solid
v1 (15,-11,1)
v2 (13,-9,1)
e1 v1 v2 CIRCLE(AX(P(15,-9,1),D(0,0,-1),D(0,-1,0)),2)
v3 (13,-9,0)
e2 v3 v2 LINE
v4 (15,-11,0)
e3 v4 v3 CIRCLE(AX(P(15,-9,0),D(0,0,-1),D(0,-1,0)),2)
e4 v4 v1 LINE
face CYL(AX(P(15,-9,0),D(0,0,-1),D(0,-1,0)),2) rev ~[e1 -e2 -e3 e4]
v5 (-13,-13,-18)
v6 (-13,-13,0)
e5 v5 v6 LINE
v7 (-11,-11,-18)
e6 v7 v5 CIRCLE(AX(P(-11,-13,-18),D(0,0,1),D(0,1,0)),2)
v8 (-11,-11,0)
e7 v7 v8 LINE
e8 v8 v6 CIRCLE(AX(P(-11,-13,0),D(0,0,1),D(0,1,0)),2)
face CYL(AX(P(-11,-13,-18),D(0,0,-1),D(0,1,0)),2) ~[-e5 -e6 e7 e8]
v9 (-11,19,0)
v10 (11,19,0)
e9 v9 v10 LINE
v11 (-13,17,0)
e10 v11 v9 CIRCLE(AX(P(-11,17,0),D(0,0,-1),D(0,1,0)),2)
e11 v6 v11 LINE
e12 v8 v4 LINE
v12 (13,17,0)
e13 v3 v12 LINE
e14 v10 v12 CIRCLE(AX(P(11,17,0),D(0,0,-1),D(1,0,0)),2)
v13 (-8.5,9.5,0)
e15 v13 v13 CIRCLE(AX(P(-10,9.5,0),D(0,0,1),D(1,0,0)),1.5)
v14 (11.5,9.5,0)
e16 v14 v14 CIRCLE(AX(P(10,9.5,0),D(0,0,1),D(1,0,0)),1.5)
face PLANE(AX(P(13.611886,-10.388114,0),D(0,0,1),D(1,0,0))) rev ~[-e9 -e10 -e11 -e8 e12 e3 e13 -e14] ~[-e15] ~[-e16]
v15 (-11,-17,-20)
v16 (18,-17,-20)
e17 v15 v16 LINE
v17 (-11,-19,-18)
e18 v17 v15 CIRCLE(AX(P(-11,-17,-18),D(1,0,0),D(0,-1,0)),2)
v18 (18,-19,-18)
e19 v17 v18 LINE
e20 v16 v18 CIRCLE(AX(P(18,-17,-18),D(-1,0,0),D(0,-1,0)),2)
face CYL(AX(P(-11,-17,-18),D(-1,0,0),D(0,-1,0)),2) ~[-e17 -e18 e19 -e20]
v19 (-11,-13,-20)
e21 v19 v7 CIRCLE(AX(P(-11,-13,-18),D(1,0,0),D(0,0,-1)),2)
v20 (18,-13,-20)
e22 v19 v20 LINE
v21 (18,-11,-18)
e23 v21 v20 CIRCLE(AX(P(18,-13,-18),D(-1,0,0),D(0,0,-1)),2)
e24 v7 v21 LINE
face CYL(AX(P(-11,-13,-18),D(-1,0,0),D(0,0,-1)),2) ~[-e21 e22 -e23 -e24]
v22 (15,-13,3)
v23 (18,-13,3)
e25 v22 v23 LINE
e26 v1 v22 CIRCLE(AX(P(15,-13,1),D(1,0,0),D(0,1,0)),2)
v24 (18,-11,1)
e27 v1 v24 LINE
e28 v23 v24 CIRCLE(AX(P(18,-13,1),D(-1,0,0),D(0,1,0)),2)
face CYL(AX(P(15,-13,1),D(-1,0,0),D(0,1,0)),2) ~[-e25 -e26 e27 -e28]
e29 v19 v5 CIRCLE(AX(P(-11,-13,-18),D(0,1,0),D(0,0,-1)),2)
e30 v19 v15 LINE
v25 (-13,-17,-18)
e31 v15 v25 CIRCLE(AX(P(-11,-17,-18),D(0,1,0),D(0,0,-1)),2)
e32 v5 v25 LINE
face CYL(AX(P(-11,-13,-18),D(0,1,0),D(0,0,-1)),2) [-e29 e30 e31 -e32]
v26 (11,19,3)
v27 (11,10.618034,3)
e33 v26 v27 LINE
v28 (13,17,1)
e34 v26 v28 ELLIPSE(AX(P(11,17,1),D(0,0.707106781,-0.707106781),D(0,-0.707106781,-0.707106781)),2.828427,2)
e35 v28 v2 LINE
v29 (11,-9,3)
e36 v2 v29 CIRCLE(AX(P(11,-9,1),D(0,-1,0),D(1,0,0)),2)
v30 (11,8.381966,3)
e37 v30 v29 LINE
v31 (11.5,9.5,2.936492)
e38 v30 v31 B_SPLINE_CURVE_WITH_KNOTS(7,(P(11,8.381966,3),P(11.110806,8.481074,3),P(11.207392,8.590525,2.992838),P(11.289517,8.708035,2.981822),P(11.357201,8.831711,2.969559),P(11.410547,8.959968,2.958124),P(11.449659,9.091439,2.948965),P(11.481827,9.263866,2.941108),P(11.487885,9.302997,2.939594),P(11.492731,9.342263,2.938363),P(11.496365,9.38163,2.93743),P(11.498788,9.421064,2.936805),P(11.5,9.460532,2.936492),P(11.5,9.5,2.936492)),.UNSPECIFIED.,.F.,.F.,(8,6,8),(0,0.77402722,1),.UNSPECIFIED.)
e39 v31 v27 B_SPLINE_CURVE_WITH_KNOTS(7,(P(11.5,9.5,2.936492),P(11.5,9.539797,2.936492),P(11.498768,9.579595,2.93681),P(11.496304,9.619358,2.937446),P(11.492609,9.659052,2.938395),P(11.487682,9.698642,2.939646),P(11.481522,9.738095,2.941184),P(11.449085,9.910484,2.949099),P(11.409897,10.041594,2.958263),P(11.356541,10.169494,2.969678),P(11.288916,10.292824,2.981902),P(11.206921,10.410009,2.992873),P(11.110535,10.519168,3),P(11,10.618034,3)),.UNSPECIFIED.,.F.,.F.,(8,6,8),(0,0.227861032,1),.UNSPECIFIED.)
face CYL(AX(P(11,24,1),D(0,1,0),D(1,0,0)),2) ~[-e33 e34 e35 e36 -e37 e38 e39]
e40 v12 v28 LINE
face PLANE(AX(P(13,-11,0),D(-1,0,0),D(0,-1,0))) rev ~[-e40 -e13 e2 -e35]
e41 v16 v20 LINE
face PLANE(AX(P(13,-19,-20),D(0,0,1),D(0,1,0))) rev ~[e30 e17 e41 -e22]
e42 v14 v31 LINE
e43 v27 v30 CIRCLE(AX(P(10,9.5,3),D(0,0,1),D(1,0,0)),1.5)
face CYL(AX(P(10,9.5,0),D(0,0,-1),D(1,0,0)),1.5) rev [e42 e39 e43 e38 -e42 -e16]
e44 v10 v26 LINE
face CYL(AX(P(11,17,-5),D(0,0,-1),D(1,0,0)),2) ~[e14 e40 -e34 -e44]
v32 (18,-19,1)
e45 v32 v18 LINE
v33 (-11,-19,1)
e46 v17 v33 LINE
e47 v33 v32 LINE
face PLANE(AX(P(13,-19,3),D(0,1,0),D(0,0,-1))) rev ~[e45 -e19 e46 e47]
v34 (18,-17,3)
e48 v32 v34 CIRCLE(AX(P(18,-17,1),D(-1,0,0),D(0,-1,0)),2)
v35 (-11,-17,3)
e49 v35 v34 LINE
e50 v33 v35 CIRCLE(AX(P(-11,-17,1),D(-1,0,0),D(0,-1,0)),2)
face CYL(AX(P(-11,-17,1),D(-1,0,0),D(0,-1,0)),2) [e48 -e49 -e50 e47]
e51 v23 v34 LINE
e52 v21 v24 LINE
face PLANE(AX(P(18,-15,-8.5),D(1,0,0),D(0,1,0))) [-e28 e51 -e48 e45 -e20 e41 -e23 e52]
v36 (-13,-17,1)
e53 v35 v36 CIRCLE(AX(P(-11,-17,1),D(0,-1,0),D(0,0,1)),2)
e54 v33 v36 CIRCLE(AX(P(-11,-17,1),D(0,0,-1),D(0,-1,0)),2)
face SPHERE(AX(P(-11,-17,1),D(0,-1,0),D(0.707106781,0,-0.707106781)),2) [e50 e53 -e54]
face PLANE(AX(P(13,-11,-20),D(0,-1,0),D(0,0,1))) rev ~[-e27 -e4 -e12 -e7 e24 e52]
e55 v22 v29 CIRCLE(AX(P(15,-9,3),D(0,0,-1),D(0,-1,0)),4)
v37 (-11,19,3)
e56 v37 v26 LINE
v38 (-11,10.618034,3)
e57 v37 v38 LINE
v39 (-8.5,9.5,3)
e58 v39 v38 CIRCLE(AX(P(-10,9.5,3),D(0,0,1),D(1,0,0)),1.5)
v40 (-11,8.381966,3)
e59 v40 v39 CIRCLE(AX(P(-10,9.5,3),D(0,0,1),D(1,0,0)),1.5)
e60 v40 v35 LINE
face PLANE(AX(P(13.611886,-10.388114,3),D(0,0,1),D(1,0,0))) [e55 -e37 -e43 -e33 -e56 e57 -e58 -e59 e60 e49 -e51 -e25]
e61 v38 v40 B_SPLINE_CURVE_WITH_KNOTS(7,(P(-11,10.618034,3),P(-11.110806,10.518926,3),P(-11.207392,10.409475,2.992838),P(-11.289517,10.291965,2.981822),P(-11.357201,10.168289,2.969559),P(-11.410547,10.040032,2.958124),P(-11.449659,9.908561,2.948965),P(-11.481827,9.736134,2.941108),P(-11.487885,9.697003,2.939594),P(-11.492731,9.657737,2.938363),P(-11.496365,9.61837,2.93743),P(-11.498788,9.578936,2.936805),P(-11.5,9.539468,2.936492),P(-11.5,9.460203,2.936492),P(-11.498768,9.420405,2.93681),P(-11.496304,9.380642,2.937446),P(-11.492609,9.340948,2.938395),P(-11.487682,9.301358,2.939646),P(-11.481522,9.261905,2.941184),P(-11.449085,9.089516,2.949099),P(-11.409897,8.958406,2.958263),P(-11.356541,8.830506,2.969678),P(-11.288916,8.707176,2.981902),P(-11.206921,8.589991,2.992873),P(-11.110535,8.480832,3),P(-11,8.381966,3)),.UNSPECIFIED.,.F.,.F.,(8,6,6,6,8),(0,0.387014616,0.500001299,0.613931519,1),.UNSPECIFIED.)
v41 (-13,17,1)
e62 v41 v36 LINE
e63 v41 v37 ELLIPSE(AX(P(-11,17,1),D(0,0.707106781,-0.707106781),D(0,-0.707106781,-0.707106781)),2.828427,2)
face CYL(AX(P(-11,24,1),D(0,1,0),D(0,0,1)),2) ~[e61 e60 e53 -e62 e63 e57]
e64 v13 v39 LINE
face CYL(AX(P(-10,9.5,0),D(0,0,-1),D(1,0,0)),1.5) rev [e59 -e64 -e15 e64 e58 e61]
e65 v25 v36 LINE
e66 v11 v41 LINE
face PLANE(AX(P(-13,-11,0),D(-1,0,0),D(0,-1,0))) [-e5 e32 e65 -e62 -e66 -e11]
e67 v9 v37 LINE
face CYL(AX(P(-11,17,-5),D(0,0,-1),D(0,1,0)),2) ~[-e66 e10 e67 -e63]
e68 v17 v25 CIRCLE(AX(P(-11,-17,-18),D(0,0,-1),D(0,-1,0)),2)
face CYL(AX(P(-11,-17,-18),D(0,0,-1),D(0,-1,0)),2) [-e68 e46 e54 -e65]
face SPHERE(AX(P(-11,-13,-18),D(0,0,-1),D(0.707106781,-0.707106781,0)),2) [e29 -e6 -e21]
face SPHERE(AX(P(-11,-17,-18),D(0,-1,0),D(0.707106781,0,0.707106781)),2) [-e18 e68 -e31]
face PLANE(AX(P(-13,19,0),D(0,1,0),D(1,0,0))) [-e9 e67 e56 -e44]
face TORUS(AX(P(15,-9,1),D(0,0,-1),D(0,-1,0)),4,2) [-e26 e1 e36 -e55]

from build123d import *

# Parameters (mm, degrees)
F0_W         = 26
F0_H         = 38
F0_R         = 1.5
F1_DEPTH     = 3
F2_W         = 26
F2_H         = 8
F3_DEPTH     = 20
F5_DEPTH     = 5
F6_T1_DEPTH  = 3
F6_T3_DEPTH  = 18
F6_T5_DEPTH  = 19
F6_T7_DEPTH  = 13
F6_T9_DEPTH  = 41
F6_T11_DEPTH = 33
F6_T13_DEPTH = 34
F6_T15_DEPTH = 4
F6_T17_DEPTH = 8
F6_S21_W     = 2.04
F6_S21_H     = 2.04
F6_T22_DEPTH = 2.04
F6_S27_W     = 2.04
F6_S27_H     = 2.04
F6_T28_DEPTH = 2.04
F6_S33_W     = 2.04
F6_S33_H     = 2.04
F6_T34_DEPTH = 2.04
F6_T38_ANGLE = 90


# Not quite as in the source:
# - a fillet or chamfer that OpenCascade refuses, or shapes differently, is made with other operations: its cross-section is extruded or revolved along the edge and cut away or added


with BuildPart() as f1:
    # F0 (on Top) → F1 (new body)
    with BuildSketch(Plane.XY):
        Rectangle(F0_W, F0_H)
        with Locations((-10, 9.5)):
            Circle(F0_R, mode=Mode.SUBTRACT)
        with Locations((10, 9.5)):
            Circle(F0_R, mode=Mode.SUBTRACT)
    extrude(amount=F1_DEPTH)

    # F2 (on face) → F3 (join)
    with BuildSketch(Plane(origin=(0, 0, 0), x_dir=(1, 0, 0), z_dir=(0, 0, -1))):
        with Locations((0, 15)):
            Rectangle(F2_W, F2_H)
    extrude(amount=F3_DEPTH)

    # F4 (on face) → F5 (join)
    with BuildSketch(Plane.YZ.offset(13)):
        Polygon((-11, -20), (-11, 0), (-11, 3), (-19, 3), (-19, -20), align=None)
    extrude(amount=F5_DEPTH)

    # F6: fillet of radius 2 on 12 edges, made by hand

    # F6_s2 → F6_t1 (join)
    with BuildSketch(Plane.XY):
        with BuildLine():
            ThreePointArc((15, -11), (13.5857864376, -10.4142135624), (13, -9))
            Line((13, -9), (13, -11))
            Line((13, -11), (15, -11))
        make_face()
    extrude(amount=F6_T1_DEPTH)

    # F6_s4 → F6_t3 (cut)
    with BuildSketch(Plane.XY.offset(-18)):
        with BuildLine():
            ThreePointArc((-11, -11), (-12.4142135624, -11.5857864376), (-13, -13))
            Line((-13, -13), (-13, -11))
            Line((-13, -11), (-11, -11))
        make_face()
    extrude(amount=F6_T3_DEPTH, mode=Mode.SUBTRACT)

    # F6_s6 → F6_t5 (cut)
    with BuildSketch(Plane.XY.offset(-18)):
        with BuildLine():
            ThreePointArc((-11, -19), (-12.4142135624, -18.4142135624), (-13, -17))
            Line((-13, -17), (-13, -19))
            Line((-13, -19), (-11, -19))
        make_face()
    extrude(amount=F6_T5_DEPTH, mode=Mode.SUBTRACT)

    # F6_s8 → F6_t7 (cut)
    with BuildSketch(Plane.XY.offset(-5)):
        with BuildLine():
            ThreePointArc((13, 17), (12.4142135624, 18.4142135624), (11, 19))
            Line((11, 19), (13, 19))
            Line((13, 19), (13, 17))
        make_face()
        with BuildLine():
            ThreePointArc((-11, 19), (-12.4142135624, 18.4142135624), (-13, 17))
            Line((-13, 17), (-13, 19))
            Line((-13, 19), (-11, 19))
        make_face()
    extrude(amount=F6_T7_DEPTH, mode=Mode.SUBTRACT)

    # F6_s10 → F6_t9 (cut)
    with BuildSketch(Plane.XZ.offset(-24)):
        with BuildLine():
            ThreePointArc((-11, 3), (-12.4142135624, 2.4142135624), (-13, 1))
            Line((-13, 1), (-13, 3))
            Line((-13, 3), (-11, 3))
        make_face()
    extrude(amount=F6_T9_DEPTH, mode=Mode.SUBTRACT)

    # F6_s12 → F6_t11 (cut)
    with BuildSketch(Plane.XZ.offset(-24)):
        with BuildLine():
            ThreePointArc((13, 1), (12.4142135624, 2.4142135624), (11, 3))
            Line((11, 3), (13, 3))
            Line((13, 3), (13, 1))
        make_face()
    extrude(amount=F6_T11_DEPTH, mode=Mode.SUBTRACT)

    # F6_s14 → F6_t13 (cut)
    with BuildSketch(Plane.YZ.offset(-11)):
        with BuildLine():
            ThreePointArc((-13, -20), (-11.5857864376, -19.4142135624), (-11, -18))
            Line((-11, -18), (-11, -20))
            Line((-11, -20), (-13, -20))
        make_face()
        with BuildLine():
            ThreePointArc((-19, -18), (-18.4142135624, -19.4142135624), (-17, -20))
            Line((-17, -20), (-19, -20))
            Line((-19, -20), (-19, -18))
        make_face()
        with BuildLine():
            ThreePointArc((-19, 1), (-18.4142135624, 2.4142135624), (-17, 3))
            Line((-17, 3), (-19, 3))
            Line((-19, 3), (-19, 1))
        make_face()
    extrude(amount=F6_T13_DEPTH, mode=Mode.SUBTRACT)

    # F6_s16 → F6_t15 (cut)
    with BuildSketch(Plane.XZ.offset(13)):
        with BuildLine():
            ThreePointArc((-11, -20), (-12.4142135624, -19.4142135624), (-13, -18))
            Line((-13, -18), (-13, -20))
            Line((-13, -20), (-11, -20))
        make_face()
    extrude(amount=F6_T15_DEPTH, mode=Mode.SUBTRACT)

    # F6_s18 → F6_t17 (cut)
    with BuildSketch(Plane.YZ.offset(15)):
        with BuildLine():
            ThreePointArc((-11, 1), (-11.5857864376, 2.4142135624), (-13, 3))
            Line((-13, 3), (-11, 3))
            Line((-11, 3), (-11, 1))
        make_face()
    extrude(amount=F6_T17_DEPTH, mode=Mode.SUBTRACT)


with BuildPart() as f6_tool20:
    # F6_s21 → F6_t22 (new body)
    with BuildSketch(Plane.XY.offset(-18)):
        with Locations((-12.02, -11.98)):
            Rectangle(F6_S21_W, F6_S21_H)
    extrude(amount=-F6_T22_DEPTH)

    # F6_s23 → F6_t24 (revolve, cut)
    with BuildSketch(Plane(origin=(-11, -13, -18), x_dir=(0.7071067812, -0.7071067812, 0), z_dir=(0.7071067812, 0.7071067812, 0))):
        with BuildLine():
            ThreePointArc((0, -2), (2, 0), (0, 2))
            Line((0, 2), (0, -2))
        make_face()
    revolve(axis=Axis((-11, -13, -18), (0, 0, -1)), mode=Mode.SUBTRACT)


with BuildPart() as f1_1:
    add(f1.part)

    # F6_t19: cut F6_tool20
    add(f6_tool20.part, mode=Mode.SUBTRACT)


with BuildPart() as f6_tool26:
    # F6_s27 → F6_t28 (new body)
    with BuildSketch(Plane.XZ.offset(17)):
        with Locations((-12.02, 2.02)):
            Rectangle(F6_S27_W, F6_S27_H)
    extrude(amount=F6_T28_DEPTH)

    # F6_s29 → F6_t30 (revolve, cut)
    with BuildSketch(Plane(origin=(-11, -17, 1), x_dir=(0.7071067812, 0, -0.7071067812), z_dir=(-0.7071067812, 0, -0.7071067812))):
        with BuildLine():
            ThreePointArc((0, -2), (2, 0), (0, 2))
            Line((0, 2), (0, -2))
        make_face()
    revolve(axis=Axis((-11, -17, 1), (0, -1, 0)), mode=Mode.SUBTRACT)


with BuildPart() as f1_2:
    add(f1_1.part)

    # F6_t25: cut F6_tool26
    add(f6_tool26.part, mode=Mode.SUBTRACT)


with BuildPart() as f6_tool32:
    # F6_s33 → F6_t34 (new body)
    with BuildSketch(Plane.XZ.offset(17)):
        with Locations((-12.02, -19.02)):
            Rectangle(F6_S33_W, F6_S33_H)
    extrude(amount=F6_T34_DEPTH)

    # F6_s35 → F6_t36 (revolve, cut)
    with BuildSketch(Plane(origin=(-11, -17, -18), x_dir=(0.7071067812, 0, 0.7071067812), z_dir=(0.7071067812, 0, -0.7071067812))):
        with BuildLine():
            ThreePointArc((0, -2), (2, 0), (0, 2))
            Line((0, 2), (0, -2))
        make_face()
    revolve(axis=Axis((-11, -17, -18), (0, -1, 0)), mode=Mode.SUBTRACT)


with BuildPart() as f1_3:
    add(f1_2.part)

    # F6_t31: cut F6_tool32
    add(f6_tool32.part, mode=Mode.SUBTRACT)

    # F6_s37 → F6_t38 (revolve, cut)
    with BuildSketch(Plane.YZ.offset(15)):
        with BuildLine():
            ThreePointArc((-11, 1), (-11.5857864376, 2.4142135624), (-13, 3))
            Line((-13, 3), (-11, 3))
            Line((-11, 3), (-11, 1))
        make_face()
    revolve(axis=Axis((15, -9, 3), (0, 0, -1)), revolution_arc=F6_T38_ANGLE, mode=Mode.SUBTRACT)


solid = f1_3.part
